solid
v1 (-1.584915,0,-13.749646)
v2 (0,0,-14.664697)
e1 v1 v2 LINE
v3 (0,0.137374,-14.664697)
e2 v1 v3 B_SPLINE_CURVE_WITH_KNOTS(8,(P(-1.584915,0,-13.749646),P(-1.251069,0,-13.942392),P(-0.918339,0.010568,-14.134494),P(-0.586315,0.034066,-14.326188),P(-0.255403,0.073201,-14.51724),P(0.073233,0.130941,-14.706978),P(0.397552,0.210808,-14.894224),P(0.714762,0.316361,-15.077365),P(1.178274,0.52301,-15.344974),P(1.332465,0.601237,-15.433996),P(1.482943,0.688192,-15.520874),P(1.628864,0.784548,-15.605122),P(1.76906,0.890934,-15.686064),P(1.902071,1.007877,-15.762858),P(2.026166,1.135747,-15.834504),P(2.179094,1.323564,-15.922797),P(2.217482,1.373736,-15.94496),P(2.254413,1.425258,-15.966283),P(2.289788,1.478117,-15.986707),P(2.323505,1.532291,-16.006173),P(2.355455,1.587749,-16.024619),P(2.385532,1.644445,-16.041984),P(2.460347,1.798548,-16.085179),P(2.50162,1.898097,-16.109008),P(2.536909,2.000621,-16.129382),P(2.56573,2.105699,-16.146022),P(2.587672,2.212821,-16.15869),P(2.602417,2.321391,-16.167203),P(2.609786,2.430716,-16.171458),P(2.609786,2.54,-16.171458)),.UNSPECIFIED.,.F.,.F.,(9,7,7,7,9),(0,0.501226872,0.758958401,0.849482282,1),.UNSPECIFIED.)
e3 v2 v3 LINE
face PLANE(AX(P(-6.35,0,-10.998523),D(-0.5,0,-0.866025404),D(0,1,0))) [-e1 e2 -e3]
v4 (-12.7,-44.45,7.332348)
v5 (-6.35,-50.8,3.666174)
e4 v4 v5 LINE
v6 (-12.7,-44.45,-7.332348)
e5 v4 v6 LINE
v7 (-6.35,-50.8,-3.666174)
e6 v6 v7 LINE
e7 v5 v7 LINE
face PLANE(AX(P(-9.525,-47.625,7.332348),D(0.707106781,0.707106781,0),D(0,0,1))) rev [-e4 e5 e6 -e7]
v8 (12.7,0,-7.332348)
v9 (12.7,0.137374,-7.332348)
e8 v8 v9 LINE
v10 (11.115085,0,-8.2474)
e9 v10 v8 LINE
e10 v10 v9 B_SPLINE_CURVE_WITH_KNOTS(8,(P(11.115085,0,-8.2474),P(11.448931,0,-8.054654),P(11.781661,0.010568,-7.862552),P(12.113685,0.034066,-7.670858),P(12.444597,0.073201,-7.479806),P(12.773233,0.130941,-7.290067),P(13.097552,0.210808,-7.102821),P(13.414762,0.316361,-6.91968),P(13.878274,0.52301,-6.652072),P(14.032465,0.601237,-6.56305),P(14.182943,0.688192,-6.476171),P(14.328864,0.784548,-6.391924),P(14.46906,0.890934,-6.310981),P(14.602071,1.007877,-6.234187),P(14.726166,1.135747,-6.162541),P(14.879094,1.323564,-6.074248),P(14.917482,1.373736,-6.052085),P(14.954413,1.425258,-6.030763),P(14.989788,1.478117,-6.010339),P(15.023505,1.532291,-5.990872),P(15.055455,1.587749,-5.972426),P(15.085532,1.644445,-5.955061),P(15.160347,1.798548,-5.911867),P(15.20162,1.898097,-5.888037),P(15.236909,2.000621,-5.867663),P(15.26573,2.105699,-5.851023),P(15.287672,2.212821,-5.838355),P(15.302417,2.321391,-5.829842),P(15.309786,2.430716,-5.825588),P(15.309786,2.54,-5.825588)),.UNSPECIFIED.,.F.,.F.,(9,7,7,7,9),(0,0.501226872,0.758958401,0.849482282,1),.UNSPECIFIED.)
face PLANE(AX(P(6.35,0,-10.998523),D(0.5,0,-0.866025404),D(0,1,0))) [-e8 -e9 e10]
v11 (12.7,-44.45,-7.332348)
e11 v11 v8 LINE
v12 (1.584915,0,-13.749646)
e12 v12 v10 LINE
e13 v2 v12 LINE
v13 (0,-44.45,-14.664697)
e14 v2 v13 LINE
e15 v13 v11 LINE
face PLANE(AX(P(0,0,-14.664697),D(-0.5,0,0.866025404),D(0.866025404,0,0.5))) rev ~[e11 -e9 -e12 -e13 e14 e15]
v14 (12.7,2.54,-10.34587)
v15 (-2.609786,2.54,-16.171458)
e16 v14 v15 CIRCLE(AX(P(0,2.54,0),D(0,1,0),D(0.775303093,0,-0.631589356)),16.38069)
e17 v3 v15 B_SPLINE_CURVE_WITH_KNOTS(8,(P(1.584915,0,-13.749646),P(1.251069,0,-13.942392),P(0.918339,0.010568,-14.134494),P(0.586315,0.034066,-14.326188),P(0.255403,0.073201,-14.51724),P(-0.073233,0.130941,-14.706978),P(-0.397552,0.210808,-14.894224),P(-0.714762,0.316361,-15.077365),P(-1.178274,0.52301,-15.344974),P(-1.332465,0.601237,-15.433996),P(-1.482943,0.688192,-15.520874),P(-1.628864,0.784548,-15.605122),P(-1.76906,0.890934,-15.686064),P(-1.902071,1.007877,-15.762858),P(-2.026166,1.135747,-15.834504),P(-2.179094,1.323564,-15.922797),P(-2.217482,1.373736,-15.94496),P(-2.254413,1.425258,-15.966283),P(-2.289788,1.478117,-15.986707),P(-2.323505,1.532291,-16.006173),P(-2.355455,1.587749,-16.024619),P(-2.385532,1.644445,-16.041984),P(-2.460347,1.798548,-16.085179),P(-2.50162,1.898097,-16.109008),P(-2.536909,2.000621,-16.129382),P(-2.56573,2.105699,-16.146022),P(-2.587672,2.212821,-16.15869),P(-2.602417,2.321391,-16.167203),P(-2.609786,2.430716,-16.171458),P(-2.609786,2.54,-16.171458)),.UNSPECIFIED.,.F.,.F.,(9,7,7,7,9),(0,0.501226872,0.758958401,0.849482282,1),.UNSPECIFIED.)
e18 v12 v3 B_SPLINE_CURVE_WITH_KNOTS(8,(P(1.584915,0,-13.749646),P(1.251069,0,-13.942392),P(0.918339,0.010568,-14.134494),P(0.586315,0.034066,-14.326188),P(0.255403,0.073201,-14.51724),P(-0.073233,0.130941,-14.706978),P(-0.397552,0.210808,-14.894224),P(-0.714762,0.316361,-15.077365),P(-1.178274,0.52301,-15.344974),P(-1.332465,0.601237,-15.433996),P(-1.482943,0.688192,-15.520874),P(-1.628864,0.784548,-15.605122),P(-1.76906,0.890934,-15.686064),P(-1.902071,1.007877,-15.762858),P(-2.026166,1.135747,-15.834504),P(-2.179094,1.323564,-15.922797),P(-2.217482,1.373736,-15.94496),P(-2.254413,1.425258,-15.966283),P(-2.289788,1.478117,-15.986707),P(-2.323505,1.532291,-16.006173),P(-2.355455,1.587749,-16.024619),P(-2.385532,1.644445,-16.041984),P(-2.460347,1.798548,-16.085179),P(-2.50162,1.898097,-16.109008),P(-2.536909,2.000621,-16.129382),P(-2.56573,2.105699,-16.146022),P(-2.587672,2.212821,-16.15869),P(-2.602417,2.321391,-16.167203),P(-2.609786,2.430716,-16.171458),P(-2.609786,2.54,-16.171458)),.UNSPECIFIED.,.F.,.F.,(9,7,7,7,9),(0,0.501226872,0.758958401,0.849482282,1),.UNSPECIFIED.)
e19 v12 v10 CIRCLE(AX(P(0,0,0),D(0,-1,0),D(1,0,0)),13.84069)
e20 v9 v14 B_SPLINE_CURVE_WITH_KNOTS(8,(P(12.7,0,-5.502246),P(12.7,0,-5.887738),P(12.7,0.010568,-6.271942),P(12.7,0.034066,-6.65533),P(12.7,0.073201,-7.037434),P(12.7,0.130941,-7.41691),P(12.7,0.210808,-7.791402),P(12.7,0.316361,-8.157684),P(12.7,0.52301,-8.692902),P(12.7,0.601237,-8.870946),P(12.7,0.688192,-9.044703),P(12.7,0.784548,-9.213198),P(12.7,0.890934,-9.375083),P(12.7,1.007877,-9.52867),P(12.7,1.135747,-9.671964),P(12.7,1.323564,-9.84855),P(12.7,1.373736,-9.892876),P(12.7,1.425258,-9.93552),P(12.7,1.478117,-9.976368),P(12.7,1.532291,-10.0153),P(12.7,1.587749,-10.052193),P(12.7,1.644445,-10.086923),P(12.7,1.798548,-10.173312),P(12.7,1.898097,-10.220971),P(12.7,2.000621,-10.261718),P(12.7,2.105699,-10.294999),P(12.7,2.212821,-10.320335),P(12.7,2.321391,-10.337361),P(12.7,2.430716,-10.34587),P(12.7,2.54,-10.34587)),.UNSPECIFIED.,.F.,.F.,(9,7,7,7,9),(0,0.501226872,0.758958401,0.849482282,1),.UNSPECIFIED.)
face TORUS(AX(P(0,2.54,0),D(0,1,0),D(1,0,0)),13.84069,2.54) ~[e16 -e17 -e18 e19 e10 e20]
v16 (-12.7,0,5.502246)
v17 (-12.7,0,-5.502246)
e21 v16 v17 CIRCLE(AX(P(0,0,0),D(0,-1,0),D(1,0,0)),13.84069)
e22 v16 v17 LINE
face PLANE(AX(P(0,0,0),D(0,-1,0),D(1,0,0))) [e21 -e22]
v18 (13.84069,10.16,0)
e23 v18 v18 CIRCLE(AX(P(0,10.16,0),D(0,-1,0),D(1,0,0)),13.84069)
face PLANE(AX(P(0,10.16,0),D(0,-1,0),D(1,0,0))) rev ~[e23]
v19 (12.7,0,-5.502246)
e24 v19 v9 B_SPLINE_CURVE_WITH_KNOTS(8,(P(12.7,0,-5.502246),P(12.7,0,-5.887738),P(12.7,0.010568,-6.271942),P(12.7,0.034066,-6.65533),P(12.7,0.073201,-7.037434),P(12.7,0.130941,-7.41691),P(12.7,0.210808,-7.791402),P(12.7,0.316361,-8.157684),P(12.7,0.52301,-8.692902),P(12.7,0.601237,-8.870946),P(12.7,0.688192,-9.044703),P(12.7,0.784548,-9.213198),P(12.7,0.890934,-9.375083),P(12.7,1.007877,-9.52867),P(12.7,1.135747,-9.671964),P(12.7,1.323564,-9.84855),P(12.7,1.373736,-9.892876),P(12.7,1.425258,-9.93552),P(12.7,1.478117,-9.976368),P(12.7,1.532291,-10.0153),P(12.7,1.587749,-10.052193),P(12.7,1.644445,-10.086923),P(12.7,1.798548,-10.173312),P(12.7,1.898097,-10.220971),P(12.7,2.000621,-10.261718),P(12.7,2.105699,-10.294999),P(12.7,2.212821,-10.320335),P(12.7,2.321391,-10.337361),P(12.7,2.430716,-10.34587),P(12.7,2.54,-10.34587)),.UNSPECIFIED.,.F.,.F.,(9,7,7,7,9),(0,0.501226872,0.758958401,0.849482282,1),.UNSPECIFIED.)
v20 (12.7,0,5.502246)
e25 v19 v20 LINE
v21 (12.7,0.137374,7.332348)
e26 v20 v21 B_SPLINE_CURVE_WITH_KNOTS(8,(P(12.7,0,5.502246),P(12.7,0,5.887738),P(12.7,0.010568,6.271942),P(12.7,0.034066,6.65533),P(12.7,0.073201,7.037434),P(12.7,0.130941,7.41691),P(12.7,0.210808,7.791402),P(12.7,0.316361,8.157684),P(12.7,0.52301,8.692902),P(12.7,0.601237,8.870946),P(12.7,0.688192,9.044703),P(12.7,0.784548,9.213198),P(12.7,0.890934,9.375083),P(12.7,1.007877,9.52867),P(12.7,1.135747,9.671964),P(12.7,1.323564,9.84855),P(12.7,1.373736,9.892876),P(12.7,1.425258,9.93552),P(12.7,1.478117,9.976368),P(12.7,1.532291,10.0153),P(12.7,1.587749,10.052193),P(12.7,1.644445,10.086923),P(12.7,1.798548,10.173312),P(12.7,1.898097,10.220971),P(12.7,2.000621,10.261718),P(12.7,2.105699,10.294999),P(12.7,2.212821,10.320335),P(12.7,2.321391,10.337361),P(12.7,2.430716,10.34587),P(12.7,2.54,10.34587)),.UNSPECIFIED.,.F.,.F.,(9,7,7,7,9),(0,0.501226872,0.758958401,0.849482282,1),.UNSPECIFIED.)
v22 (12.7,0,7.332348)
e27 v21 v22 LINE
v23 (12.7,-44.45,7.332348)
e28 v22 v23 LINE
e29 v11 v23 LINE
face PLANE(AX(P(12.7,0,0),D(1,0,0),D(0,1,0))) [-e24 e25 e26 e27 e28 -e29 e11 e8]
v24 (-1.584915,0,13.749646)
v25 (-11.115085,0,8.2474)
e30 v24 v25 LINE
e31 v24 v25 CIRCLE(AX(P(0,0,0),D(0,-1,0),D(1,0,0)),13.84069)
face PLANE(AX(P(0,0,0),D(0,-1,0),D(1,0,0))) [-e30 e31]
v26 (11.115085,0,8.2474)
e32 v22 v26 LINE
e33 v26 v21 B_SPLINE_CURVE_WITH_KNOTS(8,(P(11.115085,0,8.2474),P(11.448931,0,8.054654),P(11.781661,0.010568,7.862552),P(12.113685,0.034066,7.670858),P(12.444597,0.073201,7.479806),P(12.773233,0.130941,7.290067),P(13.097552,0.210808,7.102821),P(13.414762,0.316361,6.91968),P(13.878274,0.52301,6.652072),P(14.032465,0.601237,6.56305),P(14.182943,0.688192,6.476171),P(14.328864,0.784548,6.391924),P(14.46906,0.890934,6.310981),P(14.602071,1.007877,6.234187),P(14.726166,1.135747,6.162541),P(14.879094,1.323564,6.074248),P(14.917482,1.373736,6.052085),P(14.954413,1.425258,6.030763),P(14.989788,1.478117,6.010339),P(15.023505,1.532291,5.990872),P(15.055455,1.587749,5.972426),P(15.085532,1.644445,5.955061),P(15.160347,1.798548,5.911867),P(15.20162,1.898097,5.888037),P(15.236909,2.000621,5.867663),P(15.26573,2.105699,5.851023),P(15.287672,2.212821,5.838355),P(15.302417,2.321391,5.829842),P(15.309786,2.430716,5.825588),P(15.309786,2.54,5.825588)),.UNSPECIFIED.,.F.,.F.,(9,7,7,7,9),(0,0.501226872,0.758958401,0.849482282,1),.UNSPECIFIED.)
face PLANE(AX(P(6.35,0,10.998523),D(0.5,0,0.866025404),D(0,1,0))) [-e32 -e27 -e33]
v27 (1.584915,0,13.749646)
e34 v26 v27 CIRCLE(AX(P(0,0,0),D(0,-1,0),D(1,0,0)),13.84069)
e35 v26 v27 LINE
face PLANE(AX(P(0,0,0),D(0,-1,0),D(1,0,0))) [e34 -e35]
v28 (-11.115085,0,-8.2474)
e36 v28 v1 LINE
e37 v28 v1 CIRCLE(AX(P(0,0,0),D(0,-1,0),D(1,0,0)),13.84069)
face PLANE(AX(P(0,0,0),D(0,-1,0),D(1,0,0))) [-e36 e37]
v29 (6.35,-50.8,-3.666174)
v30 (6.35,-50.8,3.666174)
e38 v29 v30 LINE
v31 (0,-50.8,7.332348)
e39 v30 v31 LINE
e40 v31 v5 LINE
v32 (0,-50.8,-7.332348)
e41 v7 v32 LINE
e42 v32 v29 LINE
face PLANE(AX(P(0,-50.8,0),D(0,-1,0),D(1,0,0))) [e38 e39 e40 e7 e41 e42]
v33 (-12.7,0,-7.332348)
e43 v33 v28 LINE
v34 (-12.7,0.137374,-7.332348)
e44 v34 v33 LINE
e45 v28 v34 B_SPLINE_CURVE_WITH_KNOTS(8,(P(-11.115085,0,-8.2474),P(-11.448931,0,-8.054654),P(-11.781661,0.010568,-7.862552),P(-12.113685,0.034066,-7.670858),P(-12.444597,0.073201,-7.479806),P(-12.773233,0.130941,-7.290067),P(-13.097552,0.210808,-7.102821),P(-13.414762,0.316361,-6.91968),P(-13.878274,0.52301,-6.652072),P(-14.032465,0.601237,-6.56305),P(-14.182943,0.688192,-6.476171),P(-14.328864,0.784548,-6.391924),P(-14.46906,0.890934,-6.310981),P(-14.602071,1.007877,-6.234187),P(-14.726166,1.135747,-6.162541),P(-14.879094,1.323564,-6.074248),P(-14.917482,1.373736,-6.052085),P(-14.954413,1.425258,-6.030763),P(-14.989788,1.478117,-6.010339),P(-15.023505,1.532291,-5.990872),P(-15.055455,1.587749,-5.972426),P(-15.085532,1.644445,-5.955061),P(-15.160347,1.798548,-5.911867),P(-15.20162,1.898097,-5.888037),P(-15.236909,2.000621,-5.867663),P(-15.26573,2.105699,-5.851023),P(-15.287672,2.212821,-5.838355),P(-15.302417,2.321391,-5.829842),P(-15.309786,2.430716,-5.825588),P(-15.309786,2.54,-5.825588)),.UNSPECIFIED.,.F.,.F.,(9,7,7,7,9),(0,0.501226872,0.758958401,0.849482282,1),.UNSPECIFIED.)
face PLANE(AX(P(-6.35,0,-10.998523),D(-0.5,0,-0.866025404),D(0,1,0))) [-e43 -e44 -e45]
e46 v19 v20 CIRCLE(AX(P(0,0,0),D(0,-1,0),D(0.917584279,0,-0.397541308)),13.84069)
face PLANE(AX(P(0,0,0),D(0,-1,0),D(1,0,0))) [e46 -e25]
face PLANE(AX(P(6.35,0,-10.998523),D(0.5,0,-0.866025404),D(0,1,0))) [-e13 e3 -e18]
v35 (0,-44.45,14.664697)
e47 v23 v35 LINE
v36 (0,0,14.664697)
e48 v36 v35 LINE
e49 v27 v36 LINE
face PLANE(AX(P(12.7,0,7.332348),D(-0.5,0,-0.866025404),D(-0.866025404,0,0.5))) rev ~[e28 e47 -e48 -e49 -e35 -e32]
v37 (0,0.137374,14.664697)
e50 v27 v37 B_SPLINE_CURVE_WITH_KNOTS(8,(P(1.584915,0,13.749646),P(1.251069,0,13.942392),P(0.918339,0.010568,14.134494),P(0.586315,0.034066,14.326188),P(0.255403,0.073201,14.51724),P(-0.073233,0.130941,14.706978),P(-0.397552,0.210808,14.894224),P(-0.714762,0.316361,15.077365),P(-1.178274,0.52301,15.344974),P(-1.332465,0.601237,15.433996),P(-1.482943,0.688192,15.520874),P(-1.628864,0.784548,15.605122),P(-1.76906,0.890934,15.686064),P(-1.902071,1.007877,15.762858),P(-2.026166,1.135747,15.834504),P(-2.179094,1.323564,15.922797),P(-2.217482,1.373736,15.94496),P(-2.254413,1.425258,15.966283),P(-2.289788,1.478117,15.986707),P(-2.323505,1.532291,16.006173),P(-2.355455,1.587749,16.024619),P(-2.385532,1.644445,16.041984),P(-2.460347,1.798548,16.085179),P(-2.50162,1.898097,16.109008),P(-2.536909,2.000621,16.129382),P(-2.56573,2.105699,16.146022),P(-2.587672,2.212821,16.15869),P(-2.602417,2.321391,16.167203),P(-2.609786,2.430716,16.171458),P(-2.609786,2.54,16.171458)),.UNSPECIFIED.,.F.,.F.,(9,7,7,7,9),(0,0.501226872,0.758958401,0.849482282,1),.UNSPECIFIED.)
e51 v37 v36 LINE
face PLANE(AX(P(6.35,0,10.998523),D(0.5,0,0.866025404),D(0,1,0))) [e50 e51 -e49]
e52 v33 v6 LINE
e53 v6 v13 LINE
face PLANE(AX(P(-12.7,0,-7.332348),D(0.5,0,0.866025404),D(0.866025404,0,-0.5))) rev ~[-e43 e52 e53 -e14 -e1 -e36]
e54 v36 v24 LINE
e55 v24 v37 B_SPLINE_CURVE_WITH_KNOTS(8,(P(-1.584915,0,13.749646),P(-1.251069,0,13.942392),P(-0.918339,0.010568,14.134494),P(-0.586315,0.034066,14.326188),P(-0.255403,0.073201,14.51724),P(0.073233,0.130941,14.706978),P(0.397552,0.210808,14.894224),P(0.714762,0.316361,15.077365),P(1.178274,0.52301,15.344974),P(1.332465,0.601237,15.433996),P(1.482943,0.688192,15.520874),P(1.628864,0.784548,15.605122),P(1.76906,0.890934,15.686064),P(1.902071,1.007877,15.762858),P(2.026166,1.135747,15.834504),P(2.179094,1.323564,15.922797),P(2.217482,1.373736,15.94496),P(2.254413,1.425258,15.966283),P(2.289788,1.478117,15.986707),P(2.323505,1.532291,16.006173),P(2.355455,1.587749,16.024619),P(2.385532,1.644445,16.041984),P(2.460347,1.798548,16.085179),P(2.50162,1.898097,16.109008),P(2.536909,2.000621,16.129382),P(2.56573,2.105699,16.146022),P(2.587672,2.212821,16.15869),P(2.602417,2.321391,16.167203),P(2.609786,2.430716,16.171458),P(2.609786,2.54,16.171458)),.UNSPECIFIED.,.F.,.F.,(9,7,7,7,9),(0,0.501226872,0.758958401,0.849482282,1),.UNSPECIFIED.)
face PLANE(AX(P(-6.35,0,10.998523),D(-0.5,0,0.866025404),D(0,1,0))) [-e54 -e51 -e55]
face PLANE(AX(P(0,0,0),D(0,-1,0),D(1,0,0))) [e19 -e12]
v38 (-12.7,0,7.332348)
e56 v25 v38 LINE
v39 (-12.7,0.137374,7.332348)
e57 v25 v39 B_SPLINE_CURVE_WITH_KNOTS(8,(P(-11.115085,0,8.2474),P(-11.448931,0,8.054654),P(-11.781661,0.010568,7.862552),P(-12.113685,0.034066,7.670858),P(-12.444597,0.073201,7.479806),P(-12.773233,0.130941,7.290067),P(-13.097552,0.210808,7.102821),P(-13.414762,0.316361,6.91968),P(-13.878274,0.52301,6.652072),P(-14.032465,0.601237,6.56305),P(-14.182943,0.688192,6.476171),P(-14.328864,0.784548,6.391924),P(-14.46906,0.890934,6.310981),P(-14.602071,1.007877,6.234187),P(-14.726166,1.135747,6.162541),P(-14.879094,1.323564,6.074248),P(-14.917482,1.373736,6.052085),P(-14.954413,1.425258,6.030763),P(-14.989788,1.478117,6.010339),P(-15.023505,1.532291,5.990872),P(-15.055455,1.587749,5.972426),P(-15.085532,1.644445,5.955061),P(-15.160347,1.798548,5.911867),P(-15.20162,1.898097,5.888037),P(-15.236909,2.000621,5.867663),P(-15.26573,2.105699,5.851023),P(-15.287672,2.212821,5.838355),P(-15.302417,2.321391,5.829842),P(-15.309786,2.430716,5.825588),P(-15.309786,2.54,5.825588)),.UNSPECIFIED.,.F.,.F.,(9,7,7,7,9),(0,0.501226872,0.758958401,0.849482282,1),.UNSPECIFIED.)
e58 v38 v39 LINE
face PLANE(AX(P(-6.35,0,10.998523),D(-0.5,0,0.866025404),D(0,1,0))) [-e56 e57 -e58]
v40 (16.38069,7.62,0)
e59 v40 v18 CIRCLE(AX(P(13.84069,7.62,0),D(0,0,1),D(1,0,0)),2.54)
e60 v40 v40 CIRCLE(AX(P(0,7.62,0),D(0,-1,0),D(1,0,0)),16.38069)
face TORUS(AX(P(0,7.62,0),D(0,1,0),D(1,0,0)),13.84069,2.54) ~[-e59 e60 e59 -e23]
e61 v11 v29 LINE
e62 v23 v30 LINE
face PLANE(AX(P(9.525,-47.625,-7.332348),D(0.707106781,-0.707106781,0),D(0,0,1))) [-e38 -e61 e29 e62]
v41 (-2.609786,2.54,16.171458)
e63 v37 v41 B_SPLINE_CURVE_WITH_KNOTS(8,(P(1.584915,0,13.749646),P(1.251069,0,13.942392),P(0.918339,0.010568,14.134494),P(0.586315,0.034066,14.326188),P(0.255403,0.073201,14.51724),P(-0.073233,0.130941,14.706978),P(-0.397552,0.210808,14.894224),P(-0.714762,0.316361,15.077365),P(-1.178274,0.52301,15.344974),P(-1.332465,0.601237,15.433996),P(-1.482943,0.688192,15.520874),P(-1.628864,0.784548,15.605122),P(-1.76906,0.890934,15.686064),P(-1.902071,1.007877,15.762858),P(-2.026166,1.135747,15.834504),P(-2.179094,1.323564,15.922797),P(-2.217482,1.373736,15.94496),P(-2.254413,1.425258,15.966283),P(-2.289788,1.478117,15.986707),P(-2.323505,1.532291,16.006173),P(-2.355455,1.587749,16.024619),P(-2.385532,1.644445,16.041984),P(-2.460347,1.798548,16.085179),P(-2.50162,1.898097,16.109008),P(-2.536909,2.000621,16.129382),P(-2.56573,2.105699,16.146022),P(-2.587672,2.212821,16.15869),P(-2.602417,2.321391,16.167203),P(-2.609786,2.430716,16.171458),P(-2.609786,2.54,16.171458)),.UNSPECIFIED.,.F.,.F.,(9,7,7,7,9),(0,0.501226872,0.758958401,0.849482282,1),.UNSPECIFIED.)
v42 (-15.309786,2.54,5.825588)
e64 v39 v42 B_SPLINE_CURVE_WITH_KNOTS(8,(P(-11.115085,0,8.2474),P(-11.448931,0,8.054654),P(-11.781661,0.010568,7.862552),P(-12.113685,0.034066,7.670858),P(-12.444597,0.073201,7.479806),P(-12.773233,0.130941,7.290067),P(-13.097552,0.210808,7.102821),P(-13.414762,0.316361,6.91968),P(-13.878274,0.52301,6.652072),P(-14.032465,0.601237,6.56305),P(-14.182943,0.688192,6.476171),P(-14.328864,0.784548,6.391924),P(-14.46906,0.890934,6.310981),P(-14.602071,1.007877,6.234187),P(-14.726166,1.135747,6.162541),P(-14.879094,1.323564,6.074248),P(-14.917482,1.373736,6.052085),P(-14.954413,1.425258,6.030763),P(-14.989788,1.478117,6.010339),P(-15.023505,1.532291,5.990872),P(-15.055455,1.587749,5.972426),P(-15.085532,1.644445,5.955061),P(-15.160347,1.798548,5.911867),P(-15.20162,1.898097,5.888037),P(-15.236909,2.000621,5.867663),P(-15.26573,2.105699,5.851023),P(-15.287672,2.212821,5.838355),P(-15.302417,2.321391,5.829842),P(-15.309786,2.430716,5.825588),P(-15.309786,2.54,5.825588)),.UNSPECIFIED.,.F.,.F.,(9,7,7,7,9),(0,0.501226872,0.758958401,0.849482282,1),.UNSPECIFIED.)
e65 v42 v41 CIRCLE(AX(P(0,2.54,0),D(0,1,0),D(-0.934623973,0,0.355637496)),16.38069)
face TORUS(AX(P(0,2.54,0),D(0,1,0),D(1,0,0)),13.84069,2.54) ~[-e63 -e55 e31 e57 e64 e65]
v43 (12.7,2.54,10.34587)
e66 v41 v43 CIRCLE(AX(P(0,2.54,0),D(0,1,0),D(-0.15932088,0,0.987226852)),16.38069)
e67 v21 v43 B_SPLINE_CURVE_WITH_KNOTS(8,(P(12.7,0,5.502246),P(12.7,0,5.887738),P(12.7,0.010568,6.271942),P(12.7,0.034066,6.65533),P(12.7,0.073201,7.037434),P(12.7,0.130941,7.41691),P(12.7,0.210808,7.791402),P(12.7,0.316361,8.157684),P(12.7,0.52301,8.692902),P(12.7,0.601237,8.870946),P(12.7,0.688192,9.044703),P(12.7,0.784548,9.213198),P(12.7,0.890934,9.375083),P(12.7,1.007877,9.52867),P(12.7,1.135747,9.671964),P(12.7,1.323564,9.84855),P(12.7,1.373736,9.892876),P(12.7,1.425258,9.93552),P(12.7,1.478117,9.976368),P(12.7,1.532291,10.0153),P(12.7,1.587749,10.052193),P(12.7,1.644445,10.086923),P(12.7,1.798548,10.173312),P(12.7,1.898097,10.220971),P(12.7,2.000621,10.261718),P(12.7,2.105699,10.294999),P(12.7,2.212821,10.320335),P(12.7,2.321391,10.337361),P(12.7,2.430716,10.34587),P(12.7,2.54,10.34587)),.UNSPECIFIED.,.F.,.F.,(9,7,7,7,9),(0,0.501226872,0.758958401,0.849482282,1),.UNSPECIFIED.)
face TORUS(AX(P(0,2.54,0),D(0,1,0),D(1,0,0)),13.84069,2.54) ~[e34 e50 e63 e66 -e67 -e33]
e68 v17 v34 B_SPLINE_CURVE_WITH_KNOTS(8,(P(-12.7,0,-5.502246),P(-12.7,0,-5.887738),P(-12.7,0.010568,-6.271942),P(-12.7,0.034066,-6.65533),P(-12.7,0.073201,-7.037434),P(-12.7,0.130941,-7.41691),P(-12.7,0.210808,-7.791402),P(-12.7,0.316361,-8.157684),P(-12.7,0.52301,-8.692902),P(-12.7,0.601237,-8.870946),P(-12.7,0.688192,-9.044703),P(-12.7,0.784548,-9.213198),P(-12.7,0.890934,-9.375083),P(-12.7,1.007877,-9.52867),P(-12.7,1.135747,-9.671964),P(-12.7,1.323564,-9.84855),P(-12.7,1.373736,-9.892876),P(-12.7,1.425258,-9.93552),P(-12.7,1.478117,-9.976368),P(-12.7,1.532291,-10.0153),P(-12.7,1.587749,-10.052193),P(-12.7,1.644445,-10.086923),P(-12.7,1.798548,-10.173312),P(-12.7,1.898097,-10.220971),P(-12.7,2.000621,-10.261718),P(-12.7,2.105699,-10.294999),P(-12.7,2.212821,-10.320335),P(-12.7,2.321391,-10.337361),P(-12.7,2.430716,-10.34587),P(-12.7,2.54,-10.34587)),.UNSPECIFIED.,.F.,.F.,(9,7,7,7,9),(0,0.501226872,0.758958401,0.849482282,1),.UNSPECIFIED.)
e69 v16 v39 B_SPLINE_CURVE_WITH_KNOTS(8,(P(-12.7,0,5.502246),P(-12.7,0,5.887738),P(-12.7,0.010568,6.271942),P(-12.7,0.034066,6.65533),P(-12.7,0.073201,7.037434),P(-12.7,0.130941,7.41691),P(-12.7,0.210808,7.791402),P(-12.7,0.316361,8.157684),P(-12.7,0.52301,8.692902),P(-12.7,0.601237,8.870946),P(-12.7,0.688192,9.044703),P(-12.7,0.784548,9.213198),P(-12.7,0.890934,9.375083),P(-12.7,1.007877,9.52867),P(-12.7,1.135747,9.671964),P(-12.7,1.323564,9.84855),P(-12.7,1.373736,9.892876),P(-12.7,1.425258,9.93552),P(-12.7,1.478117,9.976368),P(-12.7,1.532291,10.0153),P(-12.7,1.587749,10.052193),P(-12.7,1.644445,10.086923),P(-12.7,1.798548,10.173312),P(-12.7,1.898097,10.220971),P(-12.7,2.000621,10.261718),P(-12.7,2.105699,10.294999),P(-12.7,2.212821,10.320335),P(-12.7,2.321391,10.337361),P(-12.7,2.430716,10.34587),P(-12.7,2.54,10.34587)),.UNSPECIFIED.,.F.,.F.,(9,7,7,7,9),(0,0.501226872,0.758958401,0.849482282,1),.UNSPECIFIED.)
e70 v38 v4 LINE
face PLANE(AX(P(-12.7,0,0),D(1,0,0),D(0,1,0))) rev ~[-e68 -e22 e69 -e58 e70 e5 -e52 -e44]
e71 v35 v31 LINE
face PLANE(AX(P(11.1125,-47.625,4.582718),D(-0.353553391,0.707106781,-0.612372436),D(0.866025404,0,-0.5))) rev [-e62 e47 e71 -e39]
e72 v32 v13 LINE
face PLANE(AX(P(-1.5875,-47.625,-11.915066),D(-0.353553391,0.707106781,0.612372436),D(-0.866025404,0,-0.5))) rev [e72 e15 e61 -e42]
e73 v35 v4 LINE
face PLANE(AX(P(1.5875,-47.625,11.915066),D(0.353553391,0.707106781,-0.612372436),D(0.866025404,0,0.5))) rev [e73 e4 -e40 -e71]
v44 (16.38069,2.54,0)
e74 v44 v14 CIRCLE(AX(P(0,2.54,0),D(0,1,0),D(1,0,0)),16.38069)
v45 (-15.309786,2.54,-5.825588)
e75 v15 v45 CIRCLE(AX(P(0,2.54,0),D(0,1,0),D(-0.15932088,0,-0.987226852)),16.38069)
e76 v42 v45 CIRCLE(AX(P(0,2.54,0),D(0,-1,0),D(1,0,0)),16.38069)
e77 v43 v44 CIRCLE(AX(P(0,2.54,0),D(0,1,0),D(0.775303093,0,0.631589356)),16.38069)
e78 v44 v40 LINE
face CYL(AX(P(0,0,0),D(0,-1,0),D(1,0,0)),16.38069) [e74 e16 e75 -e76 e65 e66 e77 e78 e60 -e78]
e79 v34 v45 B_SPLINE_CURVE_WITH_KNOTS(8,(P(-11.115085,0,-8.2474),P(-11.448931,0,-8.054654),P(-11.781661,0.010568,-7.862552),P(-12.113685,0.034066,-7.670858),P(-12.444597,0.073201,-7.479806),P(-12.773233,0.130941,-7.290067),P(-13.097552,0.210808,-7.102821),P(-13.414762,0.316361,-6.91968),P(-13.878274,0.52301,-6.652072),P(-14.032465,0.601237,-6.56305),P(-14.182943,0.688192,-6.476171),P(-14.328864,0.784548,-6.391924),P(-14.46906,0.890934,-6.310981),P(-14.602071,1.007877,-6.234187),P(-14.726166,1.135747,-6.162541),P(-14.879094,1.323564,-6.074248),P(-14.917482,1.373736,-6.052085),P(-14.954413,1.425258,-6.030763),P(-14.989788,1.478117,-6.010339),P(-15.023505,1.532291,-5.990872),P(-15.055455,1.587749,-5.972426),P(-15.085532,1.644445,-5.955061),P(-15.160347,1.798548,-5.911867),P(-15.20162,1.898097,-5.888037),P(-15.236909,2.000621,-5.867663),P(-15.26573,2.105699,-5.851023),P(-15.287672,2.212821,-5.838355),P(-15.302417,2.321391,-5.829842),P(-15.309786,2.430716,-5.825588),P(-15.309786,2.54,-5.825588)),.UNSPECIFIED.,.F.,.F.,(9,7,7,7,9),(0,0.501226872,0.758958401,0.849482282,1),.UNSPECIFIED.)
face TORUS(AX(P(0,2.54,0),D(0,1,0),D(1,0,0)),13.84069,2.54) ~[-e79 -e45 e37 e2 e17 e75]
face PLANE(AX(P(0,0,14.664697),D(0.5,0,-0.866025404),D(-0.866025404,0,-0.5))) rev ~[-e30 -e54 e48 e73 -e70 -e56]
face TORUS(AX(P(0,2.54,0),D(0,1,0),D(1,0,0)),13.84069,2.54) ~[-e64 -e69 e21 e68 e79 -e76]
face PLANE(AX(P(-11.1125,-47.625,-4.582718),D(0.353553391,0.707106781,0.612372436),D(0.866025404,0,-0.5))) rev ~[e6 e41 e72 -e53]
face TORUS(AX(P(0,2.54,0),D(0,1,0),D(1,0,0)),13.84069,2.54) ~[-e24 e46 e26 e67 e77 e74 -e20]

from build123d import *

# Parameters (mm, degrees)
F1_DEPTH = 50.8
F2_R     = 16.3806904911
F3_DEPTH = 10.16
F6_SIZE  = 6.35


# Not quite as in the source:
# - a fillet or chamfer that OpenCascade refuses, or shapes differently, is made with other operations: its cross-section is extruded or revolved along the edge and cut away or added


with BuildPart() as f1:
    # F0 (on Front) → F1 (new body)
    with BuildSketch(Plane.XZ):
        Polygon((12.7, -7.3323484187), (12.7, 7.3323484187), (0, 14.6646968374), (-12.7, 7.3323484187), (-12.7, -7.3323484187), (0, -14.6646968374), align=None)
    extrude(amount=F1_DEPTH)

    # F2 (on Front) + F1_face (on face) + F1_face1 (on face) → F3 (join)
    with BuildSketch(Plane.XZ):
        Circle(F2_R)
    with BuildSketch(Plane(origin=(0, 0, 0), x_dir=(1, 0, 0), z_dir=(0, 1, 0))):
        Polygon((12.7, -7.3323484187), (12.7, 7.3323484187), (0, 14.6646968374), (-12.7, 7.3323484187), (-12.7, -7.3323484187), (0, -14.6646968374), align=None)
    with BuildSketch(Plane.XZ.offset(50.8)):
        Polygon((12.7, -7.3323484187), (12.7, 7.3323484187), (0, 14.6646968374), (-12.7, 7.3323484187), (-12.7, -7.3323484187), (0, -14.6646968374), align=None)
    extrude(amount=-F3_DEPTH, dir=(0, -1, 0))

    # F4: fillet of radius 2.54 on 3 edges, made by hand

    # F4_s1 → F4_t2 (revolve, cut)
    with BuildSketch(Plane.XY):
        with BuildLine():
            ThreePointArc((16.3806904911, 7.62), (15.6367417153, 9.4160512242), (13.8406904911, 10.16))
            Line((13.8406904911, 10.16), (16.3806904911, 10.16))
            Line((16.3806904911, 10.16), (16.3806904911, 7.62))
        make_face()
    revolve(axis=Axis((0, 10.16, 0), (0, -1, 0)), mode=Mode.SUBTRACT)


with BuildPart() as f4_tool4:
    # F4_s5 → F4_t6 (revolve)
    with BuildSketch(Plane.XY):
        with BuildLine():
            ThreePointArc((13.8406904911, 0), (15.6367417153, 0.7439487758), (16.3806904911, 2.54))
            Line((16.3806904911, 2.54), (16.3806904911, 0))
            Line((16.3806904911, 0), (13.8406904911, 0))
        make_face()
    revolve(axis=Axis((0, 0, 0), (0, -1, 0)))

    split(bisect_by=Plane.YZ.offset(12.7), keep=Keep.TOP)


with BuildPart() as f1_1:
    add(f1.part)

    # F4_t3: cut F4_tool4
    add(f4_tool4.part, mode=Mode.SUBTRACT)


with BuildPart() as f4_tool9:
    # F4_s10 → F4_t11 (revolve)
    with BuildSketch(Plane.XY):
        with BuildLine():
            ThreePointArc((13.8406904911, 0), (15.6367417153, 0.7439487758), (16.3806904911, 2.54))
            Line((16.3806904911, 2.54), (16.3806904911, 0))
            Line((16.3806904911, 0), (13.8406904911, 0))
        make_face()
    revolve(axis=Axis((0, 0, 0), (0, -1, 0)))

    split(bisect_by=Plane(origin=(6.35, 0, 10.9985226281), x_dir=(0, 1, 0), z_dir=(0.5, 0, 0.8660254038)), keep=Keep.TOP)


with BuildPart() as f1_2:
    add(f1_1.part)

    # F4_t8: cut F4_tool9
    add(f4_tool9.part, mode=Mode.SUBTRACT)


with BuildPart() as f4_tool14:
    # F4_s15 → F4_t16 (revolve)
    with BuildSketch(Plane.XY):
        with BuildLine():
            ThreePointArc((13.8406904911, 0), (15.6367417153, 0.7439487758), (16.3806904911, 2.54))
            Line((16.3806904911, 2.54), (16.3806904911, 0))
            Line((16.3806904911, 0), (13.8406904911, 0))
        make_face()
    revolve(axis=Axis((0, 0, 0), (0, -1, 0)))

    split(bisect_by=Plane(origin=(6.35, 0, -10.9985226281), x_dir=(0, 1, 0), z_dir=(0.5, 0, -0.8660254038)), keep=Keep.TOP)


with BuildPart() as f1_3:
    add(f1_2.part)

    # F4_t13: cut F4_tool14
    add(f4_tool14.part, mode=Mode.SUBTRACT)


with BuildPart() as f4_tool19:
    # F4_s20 → F4_t21 (revolve)
    with BuildSketch(Plane.XY):
        with BuildLine():
            ThreePointArc((13.8406904911, 0), (15.6367417153, 0.7439487758), (16.3806904911, 2.54))
            Line((16.3806904911, 2.54), (16.3806904911, 0))
            Line((16.3806904911, 0), (13.8406904911, 0))
        make_face()
    revolve(axis=Axis((0, 0, 0), (0, -1, 0)))

    split(bisect_by=Plane(origin=(-6.35, 0, 10.9985226281), x_dir=(0, 1, 0), z_dir=(-0.5, 0, 0.8660254038)), keep=Keep.TOP)


with BuildPart() as f1_4:
    add(f1_3.part)

    # F4_t18: cut F4_tool19
    add(f4_tool19.part, mode=Mode.SUBTRACT)


with BuildPart() as f4_tool24:
    # F4_s25 → F4_t26 (revolve)
    with BuildSketch(Plane.XY):
        with BuildLine():
            ThreePointArc((13.8406904911, 0), (15.6367417153, 0.7439487758), (16.3806904911, 2.54))
            Line((16.3806904911, 2.54), (16.3806904911, 0))
            Line((16.3806904911, 0), (13.8406904911, 0))
        make_face()
    revolve(axis=Axis((0, 0, 0), (0, -1, 0)))

    split(bisect_by=Plane(origin=(-6.35, 0, -10.9985226281), x_dir=(0, 1, 0), z_dir=(-0.5, 0, -0.8660254038)), keep=Keep.TOP)


with BuildPart() as f1_5:
    add(f1_4.part)

    # F4_t23: cut F4_tool24
    add(f4_tool24.part, mode=Mode.SUBTRACT)


with BuildPart() as f4_tool29:
    # F4_s30 → F4_t31 (revolve)
    with BuildSketch(Plane.XY):
        with BuildLine():
            ThreePointArc((13.8406904911, 0), (15.6367417153, 0.7439487758), (16.3806904911, 2.54))
            Line((16.3806904911, 2.54), (16.3806904911, 0))
            Line((16.3806904911, 0), (13.8406904911, 0))
        make_face()
    revolve(axis=Axis((0, 0, 0), (0, -1, 0)))

    split(bisect_by=Plane.YZ.offset(-12.7), keep=Keep.BOTTOM)


with BuildPart() as f1_6:
    add(f1_5.part)

    # F4_t28: cut F4_tool29
    add(f4_tool29.part, mode=Mode.SUBTRACT)

    # F6
    f6_edges = [f1_6.edges().sort_by_distance(p)[0] for p in [
        (12.7, -50.8, 0),
        (6.35, -50.8, 10.998523),
        (-6.35, -50.8, 10.998523),
        (-12.7, -50.8, 0),
        (-6.35, -50.8, -10.998523),
        (6.35, -50.8, -10.998523),
    ]]
    chamfer(f6_edges, length=F6_SIZE)


solid = f1_6.part
